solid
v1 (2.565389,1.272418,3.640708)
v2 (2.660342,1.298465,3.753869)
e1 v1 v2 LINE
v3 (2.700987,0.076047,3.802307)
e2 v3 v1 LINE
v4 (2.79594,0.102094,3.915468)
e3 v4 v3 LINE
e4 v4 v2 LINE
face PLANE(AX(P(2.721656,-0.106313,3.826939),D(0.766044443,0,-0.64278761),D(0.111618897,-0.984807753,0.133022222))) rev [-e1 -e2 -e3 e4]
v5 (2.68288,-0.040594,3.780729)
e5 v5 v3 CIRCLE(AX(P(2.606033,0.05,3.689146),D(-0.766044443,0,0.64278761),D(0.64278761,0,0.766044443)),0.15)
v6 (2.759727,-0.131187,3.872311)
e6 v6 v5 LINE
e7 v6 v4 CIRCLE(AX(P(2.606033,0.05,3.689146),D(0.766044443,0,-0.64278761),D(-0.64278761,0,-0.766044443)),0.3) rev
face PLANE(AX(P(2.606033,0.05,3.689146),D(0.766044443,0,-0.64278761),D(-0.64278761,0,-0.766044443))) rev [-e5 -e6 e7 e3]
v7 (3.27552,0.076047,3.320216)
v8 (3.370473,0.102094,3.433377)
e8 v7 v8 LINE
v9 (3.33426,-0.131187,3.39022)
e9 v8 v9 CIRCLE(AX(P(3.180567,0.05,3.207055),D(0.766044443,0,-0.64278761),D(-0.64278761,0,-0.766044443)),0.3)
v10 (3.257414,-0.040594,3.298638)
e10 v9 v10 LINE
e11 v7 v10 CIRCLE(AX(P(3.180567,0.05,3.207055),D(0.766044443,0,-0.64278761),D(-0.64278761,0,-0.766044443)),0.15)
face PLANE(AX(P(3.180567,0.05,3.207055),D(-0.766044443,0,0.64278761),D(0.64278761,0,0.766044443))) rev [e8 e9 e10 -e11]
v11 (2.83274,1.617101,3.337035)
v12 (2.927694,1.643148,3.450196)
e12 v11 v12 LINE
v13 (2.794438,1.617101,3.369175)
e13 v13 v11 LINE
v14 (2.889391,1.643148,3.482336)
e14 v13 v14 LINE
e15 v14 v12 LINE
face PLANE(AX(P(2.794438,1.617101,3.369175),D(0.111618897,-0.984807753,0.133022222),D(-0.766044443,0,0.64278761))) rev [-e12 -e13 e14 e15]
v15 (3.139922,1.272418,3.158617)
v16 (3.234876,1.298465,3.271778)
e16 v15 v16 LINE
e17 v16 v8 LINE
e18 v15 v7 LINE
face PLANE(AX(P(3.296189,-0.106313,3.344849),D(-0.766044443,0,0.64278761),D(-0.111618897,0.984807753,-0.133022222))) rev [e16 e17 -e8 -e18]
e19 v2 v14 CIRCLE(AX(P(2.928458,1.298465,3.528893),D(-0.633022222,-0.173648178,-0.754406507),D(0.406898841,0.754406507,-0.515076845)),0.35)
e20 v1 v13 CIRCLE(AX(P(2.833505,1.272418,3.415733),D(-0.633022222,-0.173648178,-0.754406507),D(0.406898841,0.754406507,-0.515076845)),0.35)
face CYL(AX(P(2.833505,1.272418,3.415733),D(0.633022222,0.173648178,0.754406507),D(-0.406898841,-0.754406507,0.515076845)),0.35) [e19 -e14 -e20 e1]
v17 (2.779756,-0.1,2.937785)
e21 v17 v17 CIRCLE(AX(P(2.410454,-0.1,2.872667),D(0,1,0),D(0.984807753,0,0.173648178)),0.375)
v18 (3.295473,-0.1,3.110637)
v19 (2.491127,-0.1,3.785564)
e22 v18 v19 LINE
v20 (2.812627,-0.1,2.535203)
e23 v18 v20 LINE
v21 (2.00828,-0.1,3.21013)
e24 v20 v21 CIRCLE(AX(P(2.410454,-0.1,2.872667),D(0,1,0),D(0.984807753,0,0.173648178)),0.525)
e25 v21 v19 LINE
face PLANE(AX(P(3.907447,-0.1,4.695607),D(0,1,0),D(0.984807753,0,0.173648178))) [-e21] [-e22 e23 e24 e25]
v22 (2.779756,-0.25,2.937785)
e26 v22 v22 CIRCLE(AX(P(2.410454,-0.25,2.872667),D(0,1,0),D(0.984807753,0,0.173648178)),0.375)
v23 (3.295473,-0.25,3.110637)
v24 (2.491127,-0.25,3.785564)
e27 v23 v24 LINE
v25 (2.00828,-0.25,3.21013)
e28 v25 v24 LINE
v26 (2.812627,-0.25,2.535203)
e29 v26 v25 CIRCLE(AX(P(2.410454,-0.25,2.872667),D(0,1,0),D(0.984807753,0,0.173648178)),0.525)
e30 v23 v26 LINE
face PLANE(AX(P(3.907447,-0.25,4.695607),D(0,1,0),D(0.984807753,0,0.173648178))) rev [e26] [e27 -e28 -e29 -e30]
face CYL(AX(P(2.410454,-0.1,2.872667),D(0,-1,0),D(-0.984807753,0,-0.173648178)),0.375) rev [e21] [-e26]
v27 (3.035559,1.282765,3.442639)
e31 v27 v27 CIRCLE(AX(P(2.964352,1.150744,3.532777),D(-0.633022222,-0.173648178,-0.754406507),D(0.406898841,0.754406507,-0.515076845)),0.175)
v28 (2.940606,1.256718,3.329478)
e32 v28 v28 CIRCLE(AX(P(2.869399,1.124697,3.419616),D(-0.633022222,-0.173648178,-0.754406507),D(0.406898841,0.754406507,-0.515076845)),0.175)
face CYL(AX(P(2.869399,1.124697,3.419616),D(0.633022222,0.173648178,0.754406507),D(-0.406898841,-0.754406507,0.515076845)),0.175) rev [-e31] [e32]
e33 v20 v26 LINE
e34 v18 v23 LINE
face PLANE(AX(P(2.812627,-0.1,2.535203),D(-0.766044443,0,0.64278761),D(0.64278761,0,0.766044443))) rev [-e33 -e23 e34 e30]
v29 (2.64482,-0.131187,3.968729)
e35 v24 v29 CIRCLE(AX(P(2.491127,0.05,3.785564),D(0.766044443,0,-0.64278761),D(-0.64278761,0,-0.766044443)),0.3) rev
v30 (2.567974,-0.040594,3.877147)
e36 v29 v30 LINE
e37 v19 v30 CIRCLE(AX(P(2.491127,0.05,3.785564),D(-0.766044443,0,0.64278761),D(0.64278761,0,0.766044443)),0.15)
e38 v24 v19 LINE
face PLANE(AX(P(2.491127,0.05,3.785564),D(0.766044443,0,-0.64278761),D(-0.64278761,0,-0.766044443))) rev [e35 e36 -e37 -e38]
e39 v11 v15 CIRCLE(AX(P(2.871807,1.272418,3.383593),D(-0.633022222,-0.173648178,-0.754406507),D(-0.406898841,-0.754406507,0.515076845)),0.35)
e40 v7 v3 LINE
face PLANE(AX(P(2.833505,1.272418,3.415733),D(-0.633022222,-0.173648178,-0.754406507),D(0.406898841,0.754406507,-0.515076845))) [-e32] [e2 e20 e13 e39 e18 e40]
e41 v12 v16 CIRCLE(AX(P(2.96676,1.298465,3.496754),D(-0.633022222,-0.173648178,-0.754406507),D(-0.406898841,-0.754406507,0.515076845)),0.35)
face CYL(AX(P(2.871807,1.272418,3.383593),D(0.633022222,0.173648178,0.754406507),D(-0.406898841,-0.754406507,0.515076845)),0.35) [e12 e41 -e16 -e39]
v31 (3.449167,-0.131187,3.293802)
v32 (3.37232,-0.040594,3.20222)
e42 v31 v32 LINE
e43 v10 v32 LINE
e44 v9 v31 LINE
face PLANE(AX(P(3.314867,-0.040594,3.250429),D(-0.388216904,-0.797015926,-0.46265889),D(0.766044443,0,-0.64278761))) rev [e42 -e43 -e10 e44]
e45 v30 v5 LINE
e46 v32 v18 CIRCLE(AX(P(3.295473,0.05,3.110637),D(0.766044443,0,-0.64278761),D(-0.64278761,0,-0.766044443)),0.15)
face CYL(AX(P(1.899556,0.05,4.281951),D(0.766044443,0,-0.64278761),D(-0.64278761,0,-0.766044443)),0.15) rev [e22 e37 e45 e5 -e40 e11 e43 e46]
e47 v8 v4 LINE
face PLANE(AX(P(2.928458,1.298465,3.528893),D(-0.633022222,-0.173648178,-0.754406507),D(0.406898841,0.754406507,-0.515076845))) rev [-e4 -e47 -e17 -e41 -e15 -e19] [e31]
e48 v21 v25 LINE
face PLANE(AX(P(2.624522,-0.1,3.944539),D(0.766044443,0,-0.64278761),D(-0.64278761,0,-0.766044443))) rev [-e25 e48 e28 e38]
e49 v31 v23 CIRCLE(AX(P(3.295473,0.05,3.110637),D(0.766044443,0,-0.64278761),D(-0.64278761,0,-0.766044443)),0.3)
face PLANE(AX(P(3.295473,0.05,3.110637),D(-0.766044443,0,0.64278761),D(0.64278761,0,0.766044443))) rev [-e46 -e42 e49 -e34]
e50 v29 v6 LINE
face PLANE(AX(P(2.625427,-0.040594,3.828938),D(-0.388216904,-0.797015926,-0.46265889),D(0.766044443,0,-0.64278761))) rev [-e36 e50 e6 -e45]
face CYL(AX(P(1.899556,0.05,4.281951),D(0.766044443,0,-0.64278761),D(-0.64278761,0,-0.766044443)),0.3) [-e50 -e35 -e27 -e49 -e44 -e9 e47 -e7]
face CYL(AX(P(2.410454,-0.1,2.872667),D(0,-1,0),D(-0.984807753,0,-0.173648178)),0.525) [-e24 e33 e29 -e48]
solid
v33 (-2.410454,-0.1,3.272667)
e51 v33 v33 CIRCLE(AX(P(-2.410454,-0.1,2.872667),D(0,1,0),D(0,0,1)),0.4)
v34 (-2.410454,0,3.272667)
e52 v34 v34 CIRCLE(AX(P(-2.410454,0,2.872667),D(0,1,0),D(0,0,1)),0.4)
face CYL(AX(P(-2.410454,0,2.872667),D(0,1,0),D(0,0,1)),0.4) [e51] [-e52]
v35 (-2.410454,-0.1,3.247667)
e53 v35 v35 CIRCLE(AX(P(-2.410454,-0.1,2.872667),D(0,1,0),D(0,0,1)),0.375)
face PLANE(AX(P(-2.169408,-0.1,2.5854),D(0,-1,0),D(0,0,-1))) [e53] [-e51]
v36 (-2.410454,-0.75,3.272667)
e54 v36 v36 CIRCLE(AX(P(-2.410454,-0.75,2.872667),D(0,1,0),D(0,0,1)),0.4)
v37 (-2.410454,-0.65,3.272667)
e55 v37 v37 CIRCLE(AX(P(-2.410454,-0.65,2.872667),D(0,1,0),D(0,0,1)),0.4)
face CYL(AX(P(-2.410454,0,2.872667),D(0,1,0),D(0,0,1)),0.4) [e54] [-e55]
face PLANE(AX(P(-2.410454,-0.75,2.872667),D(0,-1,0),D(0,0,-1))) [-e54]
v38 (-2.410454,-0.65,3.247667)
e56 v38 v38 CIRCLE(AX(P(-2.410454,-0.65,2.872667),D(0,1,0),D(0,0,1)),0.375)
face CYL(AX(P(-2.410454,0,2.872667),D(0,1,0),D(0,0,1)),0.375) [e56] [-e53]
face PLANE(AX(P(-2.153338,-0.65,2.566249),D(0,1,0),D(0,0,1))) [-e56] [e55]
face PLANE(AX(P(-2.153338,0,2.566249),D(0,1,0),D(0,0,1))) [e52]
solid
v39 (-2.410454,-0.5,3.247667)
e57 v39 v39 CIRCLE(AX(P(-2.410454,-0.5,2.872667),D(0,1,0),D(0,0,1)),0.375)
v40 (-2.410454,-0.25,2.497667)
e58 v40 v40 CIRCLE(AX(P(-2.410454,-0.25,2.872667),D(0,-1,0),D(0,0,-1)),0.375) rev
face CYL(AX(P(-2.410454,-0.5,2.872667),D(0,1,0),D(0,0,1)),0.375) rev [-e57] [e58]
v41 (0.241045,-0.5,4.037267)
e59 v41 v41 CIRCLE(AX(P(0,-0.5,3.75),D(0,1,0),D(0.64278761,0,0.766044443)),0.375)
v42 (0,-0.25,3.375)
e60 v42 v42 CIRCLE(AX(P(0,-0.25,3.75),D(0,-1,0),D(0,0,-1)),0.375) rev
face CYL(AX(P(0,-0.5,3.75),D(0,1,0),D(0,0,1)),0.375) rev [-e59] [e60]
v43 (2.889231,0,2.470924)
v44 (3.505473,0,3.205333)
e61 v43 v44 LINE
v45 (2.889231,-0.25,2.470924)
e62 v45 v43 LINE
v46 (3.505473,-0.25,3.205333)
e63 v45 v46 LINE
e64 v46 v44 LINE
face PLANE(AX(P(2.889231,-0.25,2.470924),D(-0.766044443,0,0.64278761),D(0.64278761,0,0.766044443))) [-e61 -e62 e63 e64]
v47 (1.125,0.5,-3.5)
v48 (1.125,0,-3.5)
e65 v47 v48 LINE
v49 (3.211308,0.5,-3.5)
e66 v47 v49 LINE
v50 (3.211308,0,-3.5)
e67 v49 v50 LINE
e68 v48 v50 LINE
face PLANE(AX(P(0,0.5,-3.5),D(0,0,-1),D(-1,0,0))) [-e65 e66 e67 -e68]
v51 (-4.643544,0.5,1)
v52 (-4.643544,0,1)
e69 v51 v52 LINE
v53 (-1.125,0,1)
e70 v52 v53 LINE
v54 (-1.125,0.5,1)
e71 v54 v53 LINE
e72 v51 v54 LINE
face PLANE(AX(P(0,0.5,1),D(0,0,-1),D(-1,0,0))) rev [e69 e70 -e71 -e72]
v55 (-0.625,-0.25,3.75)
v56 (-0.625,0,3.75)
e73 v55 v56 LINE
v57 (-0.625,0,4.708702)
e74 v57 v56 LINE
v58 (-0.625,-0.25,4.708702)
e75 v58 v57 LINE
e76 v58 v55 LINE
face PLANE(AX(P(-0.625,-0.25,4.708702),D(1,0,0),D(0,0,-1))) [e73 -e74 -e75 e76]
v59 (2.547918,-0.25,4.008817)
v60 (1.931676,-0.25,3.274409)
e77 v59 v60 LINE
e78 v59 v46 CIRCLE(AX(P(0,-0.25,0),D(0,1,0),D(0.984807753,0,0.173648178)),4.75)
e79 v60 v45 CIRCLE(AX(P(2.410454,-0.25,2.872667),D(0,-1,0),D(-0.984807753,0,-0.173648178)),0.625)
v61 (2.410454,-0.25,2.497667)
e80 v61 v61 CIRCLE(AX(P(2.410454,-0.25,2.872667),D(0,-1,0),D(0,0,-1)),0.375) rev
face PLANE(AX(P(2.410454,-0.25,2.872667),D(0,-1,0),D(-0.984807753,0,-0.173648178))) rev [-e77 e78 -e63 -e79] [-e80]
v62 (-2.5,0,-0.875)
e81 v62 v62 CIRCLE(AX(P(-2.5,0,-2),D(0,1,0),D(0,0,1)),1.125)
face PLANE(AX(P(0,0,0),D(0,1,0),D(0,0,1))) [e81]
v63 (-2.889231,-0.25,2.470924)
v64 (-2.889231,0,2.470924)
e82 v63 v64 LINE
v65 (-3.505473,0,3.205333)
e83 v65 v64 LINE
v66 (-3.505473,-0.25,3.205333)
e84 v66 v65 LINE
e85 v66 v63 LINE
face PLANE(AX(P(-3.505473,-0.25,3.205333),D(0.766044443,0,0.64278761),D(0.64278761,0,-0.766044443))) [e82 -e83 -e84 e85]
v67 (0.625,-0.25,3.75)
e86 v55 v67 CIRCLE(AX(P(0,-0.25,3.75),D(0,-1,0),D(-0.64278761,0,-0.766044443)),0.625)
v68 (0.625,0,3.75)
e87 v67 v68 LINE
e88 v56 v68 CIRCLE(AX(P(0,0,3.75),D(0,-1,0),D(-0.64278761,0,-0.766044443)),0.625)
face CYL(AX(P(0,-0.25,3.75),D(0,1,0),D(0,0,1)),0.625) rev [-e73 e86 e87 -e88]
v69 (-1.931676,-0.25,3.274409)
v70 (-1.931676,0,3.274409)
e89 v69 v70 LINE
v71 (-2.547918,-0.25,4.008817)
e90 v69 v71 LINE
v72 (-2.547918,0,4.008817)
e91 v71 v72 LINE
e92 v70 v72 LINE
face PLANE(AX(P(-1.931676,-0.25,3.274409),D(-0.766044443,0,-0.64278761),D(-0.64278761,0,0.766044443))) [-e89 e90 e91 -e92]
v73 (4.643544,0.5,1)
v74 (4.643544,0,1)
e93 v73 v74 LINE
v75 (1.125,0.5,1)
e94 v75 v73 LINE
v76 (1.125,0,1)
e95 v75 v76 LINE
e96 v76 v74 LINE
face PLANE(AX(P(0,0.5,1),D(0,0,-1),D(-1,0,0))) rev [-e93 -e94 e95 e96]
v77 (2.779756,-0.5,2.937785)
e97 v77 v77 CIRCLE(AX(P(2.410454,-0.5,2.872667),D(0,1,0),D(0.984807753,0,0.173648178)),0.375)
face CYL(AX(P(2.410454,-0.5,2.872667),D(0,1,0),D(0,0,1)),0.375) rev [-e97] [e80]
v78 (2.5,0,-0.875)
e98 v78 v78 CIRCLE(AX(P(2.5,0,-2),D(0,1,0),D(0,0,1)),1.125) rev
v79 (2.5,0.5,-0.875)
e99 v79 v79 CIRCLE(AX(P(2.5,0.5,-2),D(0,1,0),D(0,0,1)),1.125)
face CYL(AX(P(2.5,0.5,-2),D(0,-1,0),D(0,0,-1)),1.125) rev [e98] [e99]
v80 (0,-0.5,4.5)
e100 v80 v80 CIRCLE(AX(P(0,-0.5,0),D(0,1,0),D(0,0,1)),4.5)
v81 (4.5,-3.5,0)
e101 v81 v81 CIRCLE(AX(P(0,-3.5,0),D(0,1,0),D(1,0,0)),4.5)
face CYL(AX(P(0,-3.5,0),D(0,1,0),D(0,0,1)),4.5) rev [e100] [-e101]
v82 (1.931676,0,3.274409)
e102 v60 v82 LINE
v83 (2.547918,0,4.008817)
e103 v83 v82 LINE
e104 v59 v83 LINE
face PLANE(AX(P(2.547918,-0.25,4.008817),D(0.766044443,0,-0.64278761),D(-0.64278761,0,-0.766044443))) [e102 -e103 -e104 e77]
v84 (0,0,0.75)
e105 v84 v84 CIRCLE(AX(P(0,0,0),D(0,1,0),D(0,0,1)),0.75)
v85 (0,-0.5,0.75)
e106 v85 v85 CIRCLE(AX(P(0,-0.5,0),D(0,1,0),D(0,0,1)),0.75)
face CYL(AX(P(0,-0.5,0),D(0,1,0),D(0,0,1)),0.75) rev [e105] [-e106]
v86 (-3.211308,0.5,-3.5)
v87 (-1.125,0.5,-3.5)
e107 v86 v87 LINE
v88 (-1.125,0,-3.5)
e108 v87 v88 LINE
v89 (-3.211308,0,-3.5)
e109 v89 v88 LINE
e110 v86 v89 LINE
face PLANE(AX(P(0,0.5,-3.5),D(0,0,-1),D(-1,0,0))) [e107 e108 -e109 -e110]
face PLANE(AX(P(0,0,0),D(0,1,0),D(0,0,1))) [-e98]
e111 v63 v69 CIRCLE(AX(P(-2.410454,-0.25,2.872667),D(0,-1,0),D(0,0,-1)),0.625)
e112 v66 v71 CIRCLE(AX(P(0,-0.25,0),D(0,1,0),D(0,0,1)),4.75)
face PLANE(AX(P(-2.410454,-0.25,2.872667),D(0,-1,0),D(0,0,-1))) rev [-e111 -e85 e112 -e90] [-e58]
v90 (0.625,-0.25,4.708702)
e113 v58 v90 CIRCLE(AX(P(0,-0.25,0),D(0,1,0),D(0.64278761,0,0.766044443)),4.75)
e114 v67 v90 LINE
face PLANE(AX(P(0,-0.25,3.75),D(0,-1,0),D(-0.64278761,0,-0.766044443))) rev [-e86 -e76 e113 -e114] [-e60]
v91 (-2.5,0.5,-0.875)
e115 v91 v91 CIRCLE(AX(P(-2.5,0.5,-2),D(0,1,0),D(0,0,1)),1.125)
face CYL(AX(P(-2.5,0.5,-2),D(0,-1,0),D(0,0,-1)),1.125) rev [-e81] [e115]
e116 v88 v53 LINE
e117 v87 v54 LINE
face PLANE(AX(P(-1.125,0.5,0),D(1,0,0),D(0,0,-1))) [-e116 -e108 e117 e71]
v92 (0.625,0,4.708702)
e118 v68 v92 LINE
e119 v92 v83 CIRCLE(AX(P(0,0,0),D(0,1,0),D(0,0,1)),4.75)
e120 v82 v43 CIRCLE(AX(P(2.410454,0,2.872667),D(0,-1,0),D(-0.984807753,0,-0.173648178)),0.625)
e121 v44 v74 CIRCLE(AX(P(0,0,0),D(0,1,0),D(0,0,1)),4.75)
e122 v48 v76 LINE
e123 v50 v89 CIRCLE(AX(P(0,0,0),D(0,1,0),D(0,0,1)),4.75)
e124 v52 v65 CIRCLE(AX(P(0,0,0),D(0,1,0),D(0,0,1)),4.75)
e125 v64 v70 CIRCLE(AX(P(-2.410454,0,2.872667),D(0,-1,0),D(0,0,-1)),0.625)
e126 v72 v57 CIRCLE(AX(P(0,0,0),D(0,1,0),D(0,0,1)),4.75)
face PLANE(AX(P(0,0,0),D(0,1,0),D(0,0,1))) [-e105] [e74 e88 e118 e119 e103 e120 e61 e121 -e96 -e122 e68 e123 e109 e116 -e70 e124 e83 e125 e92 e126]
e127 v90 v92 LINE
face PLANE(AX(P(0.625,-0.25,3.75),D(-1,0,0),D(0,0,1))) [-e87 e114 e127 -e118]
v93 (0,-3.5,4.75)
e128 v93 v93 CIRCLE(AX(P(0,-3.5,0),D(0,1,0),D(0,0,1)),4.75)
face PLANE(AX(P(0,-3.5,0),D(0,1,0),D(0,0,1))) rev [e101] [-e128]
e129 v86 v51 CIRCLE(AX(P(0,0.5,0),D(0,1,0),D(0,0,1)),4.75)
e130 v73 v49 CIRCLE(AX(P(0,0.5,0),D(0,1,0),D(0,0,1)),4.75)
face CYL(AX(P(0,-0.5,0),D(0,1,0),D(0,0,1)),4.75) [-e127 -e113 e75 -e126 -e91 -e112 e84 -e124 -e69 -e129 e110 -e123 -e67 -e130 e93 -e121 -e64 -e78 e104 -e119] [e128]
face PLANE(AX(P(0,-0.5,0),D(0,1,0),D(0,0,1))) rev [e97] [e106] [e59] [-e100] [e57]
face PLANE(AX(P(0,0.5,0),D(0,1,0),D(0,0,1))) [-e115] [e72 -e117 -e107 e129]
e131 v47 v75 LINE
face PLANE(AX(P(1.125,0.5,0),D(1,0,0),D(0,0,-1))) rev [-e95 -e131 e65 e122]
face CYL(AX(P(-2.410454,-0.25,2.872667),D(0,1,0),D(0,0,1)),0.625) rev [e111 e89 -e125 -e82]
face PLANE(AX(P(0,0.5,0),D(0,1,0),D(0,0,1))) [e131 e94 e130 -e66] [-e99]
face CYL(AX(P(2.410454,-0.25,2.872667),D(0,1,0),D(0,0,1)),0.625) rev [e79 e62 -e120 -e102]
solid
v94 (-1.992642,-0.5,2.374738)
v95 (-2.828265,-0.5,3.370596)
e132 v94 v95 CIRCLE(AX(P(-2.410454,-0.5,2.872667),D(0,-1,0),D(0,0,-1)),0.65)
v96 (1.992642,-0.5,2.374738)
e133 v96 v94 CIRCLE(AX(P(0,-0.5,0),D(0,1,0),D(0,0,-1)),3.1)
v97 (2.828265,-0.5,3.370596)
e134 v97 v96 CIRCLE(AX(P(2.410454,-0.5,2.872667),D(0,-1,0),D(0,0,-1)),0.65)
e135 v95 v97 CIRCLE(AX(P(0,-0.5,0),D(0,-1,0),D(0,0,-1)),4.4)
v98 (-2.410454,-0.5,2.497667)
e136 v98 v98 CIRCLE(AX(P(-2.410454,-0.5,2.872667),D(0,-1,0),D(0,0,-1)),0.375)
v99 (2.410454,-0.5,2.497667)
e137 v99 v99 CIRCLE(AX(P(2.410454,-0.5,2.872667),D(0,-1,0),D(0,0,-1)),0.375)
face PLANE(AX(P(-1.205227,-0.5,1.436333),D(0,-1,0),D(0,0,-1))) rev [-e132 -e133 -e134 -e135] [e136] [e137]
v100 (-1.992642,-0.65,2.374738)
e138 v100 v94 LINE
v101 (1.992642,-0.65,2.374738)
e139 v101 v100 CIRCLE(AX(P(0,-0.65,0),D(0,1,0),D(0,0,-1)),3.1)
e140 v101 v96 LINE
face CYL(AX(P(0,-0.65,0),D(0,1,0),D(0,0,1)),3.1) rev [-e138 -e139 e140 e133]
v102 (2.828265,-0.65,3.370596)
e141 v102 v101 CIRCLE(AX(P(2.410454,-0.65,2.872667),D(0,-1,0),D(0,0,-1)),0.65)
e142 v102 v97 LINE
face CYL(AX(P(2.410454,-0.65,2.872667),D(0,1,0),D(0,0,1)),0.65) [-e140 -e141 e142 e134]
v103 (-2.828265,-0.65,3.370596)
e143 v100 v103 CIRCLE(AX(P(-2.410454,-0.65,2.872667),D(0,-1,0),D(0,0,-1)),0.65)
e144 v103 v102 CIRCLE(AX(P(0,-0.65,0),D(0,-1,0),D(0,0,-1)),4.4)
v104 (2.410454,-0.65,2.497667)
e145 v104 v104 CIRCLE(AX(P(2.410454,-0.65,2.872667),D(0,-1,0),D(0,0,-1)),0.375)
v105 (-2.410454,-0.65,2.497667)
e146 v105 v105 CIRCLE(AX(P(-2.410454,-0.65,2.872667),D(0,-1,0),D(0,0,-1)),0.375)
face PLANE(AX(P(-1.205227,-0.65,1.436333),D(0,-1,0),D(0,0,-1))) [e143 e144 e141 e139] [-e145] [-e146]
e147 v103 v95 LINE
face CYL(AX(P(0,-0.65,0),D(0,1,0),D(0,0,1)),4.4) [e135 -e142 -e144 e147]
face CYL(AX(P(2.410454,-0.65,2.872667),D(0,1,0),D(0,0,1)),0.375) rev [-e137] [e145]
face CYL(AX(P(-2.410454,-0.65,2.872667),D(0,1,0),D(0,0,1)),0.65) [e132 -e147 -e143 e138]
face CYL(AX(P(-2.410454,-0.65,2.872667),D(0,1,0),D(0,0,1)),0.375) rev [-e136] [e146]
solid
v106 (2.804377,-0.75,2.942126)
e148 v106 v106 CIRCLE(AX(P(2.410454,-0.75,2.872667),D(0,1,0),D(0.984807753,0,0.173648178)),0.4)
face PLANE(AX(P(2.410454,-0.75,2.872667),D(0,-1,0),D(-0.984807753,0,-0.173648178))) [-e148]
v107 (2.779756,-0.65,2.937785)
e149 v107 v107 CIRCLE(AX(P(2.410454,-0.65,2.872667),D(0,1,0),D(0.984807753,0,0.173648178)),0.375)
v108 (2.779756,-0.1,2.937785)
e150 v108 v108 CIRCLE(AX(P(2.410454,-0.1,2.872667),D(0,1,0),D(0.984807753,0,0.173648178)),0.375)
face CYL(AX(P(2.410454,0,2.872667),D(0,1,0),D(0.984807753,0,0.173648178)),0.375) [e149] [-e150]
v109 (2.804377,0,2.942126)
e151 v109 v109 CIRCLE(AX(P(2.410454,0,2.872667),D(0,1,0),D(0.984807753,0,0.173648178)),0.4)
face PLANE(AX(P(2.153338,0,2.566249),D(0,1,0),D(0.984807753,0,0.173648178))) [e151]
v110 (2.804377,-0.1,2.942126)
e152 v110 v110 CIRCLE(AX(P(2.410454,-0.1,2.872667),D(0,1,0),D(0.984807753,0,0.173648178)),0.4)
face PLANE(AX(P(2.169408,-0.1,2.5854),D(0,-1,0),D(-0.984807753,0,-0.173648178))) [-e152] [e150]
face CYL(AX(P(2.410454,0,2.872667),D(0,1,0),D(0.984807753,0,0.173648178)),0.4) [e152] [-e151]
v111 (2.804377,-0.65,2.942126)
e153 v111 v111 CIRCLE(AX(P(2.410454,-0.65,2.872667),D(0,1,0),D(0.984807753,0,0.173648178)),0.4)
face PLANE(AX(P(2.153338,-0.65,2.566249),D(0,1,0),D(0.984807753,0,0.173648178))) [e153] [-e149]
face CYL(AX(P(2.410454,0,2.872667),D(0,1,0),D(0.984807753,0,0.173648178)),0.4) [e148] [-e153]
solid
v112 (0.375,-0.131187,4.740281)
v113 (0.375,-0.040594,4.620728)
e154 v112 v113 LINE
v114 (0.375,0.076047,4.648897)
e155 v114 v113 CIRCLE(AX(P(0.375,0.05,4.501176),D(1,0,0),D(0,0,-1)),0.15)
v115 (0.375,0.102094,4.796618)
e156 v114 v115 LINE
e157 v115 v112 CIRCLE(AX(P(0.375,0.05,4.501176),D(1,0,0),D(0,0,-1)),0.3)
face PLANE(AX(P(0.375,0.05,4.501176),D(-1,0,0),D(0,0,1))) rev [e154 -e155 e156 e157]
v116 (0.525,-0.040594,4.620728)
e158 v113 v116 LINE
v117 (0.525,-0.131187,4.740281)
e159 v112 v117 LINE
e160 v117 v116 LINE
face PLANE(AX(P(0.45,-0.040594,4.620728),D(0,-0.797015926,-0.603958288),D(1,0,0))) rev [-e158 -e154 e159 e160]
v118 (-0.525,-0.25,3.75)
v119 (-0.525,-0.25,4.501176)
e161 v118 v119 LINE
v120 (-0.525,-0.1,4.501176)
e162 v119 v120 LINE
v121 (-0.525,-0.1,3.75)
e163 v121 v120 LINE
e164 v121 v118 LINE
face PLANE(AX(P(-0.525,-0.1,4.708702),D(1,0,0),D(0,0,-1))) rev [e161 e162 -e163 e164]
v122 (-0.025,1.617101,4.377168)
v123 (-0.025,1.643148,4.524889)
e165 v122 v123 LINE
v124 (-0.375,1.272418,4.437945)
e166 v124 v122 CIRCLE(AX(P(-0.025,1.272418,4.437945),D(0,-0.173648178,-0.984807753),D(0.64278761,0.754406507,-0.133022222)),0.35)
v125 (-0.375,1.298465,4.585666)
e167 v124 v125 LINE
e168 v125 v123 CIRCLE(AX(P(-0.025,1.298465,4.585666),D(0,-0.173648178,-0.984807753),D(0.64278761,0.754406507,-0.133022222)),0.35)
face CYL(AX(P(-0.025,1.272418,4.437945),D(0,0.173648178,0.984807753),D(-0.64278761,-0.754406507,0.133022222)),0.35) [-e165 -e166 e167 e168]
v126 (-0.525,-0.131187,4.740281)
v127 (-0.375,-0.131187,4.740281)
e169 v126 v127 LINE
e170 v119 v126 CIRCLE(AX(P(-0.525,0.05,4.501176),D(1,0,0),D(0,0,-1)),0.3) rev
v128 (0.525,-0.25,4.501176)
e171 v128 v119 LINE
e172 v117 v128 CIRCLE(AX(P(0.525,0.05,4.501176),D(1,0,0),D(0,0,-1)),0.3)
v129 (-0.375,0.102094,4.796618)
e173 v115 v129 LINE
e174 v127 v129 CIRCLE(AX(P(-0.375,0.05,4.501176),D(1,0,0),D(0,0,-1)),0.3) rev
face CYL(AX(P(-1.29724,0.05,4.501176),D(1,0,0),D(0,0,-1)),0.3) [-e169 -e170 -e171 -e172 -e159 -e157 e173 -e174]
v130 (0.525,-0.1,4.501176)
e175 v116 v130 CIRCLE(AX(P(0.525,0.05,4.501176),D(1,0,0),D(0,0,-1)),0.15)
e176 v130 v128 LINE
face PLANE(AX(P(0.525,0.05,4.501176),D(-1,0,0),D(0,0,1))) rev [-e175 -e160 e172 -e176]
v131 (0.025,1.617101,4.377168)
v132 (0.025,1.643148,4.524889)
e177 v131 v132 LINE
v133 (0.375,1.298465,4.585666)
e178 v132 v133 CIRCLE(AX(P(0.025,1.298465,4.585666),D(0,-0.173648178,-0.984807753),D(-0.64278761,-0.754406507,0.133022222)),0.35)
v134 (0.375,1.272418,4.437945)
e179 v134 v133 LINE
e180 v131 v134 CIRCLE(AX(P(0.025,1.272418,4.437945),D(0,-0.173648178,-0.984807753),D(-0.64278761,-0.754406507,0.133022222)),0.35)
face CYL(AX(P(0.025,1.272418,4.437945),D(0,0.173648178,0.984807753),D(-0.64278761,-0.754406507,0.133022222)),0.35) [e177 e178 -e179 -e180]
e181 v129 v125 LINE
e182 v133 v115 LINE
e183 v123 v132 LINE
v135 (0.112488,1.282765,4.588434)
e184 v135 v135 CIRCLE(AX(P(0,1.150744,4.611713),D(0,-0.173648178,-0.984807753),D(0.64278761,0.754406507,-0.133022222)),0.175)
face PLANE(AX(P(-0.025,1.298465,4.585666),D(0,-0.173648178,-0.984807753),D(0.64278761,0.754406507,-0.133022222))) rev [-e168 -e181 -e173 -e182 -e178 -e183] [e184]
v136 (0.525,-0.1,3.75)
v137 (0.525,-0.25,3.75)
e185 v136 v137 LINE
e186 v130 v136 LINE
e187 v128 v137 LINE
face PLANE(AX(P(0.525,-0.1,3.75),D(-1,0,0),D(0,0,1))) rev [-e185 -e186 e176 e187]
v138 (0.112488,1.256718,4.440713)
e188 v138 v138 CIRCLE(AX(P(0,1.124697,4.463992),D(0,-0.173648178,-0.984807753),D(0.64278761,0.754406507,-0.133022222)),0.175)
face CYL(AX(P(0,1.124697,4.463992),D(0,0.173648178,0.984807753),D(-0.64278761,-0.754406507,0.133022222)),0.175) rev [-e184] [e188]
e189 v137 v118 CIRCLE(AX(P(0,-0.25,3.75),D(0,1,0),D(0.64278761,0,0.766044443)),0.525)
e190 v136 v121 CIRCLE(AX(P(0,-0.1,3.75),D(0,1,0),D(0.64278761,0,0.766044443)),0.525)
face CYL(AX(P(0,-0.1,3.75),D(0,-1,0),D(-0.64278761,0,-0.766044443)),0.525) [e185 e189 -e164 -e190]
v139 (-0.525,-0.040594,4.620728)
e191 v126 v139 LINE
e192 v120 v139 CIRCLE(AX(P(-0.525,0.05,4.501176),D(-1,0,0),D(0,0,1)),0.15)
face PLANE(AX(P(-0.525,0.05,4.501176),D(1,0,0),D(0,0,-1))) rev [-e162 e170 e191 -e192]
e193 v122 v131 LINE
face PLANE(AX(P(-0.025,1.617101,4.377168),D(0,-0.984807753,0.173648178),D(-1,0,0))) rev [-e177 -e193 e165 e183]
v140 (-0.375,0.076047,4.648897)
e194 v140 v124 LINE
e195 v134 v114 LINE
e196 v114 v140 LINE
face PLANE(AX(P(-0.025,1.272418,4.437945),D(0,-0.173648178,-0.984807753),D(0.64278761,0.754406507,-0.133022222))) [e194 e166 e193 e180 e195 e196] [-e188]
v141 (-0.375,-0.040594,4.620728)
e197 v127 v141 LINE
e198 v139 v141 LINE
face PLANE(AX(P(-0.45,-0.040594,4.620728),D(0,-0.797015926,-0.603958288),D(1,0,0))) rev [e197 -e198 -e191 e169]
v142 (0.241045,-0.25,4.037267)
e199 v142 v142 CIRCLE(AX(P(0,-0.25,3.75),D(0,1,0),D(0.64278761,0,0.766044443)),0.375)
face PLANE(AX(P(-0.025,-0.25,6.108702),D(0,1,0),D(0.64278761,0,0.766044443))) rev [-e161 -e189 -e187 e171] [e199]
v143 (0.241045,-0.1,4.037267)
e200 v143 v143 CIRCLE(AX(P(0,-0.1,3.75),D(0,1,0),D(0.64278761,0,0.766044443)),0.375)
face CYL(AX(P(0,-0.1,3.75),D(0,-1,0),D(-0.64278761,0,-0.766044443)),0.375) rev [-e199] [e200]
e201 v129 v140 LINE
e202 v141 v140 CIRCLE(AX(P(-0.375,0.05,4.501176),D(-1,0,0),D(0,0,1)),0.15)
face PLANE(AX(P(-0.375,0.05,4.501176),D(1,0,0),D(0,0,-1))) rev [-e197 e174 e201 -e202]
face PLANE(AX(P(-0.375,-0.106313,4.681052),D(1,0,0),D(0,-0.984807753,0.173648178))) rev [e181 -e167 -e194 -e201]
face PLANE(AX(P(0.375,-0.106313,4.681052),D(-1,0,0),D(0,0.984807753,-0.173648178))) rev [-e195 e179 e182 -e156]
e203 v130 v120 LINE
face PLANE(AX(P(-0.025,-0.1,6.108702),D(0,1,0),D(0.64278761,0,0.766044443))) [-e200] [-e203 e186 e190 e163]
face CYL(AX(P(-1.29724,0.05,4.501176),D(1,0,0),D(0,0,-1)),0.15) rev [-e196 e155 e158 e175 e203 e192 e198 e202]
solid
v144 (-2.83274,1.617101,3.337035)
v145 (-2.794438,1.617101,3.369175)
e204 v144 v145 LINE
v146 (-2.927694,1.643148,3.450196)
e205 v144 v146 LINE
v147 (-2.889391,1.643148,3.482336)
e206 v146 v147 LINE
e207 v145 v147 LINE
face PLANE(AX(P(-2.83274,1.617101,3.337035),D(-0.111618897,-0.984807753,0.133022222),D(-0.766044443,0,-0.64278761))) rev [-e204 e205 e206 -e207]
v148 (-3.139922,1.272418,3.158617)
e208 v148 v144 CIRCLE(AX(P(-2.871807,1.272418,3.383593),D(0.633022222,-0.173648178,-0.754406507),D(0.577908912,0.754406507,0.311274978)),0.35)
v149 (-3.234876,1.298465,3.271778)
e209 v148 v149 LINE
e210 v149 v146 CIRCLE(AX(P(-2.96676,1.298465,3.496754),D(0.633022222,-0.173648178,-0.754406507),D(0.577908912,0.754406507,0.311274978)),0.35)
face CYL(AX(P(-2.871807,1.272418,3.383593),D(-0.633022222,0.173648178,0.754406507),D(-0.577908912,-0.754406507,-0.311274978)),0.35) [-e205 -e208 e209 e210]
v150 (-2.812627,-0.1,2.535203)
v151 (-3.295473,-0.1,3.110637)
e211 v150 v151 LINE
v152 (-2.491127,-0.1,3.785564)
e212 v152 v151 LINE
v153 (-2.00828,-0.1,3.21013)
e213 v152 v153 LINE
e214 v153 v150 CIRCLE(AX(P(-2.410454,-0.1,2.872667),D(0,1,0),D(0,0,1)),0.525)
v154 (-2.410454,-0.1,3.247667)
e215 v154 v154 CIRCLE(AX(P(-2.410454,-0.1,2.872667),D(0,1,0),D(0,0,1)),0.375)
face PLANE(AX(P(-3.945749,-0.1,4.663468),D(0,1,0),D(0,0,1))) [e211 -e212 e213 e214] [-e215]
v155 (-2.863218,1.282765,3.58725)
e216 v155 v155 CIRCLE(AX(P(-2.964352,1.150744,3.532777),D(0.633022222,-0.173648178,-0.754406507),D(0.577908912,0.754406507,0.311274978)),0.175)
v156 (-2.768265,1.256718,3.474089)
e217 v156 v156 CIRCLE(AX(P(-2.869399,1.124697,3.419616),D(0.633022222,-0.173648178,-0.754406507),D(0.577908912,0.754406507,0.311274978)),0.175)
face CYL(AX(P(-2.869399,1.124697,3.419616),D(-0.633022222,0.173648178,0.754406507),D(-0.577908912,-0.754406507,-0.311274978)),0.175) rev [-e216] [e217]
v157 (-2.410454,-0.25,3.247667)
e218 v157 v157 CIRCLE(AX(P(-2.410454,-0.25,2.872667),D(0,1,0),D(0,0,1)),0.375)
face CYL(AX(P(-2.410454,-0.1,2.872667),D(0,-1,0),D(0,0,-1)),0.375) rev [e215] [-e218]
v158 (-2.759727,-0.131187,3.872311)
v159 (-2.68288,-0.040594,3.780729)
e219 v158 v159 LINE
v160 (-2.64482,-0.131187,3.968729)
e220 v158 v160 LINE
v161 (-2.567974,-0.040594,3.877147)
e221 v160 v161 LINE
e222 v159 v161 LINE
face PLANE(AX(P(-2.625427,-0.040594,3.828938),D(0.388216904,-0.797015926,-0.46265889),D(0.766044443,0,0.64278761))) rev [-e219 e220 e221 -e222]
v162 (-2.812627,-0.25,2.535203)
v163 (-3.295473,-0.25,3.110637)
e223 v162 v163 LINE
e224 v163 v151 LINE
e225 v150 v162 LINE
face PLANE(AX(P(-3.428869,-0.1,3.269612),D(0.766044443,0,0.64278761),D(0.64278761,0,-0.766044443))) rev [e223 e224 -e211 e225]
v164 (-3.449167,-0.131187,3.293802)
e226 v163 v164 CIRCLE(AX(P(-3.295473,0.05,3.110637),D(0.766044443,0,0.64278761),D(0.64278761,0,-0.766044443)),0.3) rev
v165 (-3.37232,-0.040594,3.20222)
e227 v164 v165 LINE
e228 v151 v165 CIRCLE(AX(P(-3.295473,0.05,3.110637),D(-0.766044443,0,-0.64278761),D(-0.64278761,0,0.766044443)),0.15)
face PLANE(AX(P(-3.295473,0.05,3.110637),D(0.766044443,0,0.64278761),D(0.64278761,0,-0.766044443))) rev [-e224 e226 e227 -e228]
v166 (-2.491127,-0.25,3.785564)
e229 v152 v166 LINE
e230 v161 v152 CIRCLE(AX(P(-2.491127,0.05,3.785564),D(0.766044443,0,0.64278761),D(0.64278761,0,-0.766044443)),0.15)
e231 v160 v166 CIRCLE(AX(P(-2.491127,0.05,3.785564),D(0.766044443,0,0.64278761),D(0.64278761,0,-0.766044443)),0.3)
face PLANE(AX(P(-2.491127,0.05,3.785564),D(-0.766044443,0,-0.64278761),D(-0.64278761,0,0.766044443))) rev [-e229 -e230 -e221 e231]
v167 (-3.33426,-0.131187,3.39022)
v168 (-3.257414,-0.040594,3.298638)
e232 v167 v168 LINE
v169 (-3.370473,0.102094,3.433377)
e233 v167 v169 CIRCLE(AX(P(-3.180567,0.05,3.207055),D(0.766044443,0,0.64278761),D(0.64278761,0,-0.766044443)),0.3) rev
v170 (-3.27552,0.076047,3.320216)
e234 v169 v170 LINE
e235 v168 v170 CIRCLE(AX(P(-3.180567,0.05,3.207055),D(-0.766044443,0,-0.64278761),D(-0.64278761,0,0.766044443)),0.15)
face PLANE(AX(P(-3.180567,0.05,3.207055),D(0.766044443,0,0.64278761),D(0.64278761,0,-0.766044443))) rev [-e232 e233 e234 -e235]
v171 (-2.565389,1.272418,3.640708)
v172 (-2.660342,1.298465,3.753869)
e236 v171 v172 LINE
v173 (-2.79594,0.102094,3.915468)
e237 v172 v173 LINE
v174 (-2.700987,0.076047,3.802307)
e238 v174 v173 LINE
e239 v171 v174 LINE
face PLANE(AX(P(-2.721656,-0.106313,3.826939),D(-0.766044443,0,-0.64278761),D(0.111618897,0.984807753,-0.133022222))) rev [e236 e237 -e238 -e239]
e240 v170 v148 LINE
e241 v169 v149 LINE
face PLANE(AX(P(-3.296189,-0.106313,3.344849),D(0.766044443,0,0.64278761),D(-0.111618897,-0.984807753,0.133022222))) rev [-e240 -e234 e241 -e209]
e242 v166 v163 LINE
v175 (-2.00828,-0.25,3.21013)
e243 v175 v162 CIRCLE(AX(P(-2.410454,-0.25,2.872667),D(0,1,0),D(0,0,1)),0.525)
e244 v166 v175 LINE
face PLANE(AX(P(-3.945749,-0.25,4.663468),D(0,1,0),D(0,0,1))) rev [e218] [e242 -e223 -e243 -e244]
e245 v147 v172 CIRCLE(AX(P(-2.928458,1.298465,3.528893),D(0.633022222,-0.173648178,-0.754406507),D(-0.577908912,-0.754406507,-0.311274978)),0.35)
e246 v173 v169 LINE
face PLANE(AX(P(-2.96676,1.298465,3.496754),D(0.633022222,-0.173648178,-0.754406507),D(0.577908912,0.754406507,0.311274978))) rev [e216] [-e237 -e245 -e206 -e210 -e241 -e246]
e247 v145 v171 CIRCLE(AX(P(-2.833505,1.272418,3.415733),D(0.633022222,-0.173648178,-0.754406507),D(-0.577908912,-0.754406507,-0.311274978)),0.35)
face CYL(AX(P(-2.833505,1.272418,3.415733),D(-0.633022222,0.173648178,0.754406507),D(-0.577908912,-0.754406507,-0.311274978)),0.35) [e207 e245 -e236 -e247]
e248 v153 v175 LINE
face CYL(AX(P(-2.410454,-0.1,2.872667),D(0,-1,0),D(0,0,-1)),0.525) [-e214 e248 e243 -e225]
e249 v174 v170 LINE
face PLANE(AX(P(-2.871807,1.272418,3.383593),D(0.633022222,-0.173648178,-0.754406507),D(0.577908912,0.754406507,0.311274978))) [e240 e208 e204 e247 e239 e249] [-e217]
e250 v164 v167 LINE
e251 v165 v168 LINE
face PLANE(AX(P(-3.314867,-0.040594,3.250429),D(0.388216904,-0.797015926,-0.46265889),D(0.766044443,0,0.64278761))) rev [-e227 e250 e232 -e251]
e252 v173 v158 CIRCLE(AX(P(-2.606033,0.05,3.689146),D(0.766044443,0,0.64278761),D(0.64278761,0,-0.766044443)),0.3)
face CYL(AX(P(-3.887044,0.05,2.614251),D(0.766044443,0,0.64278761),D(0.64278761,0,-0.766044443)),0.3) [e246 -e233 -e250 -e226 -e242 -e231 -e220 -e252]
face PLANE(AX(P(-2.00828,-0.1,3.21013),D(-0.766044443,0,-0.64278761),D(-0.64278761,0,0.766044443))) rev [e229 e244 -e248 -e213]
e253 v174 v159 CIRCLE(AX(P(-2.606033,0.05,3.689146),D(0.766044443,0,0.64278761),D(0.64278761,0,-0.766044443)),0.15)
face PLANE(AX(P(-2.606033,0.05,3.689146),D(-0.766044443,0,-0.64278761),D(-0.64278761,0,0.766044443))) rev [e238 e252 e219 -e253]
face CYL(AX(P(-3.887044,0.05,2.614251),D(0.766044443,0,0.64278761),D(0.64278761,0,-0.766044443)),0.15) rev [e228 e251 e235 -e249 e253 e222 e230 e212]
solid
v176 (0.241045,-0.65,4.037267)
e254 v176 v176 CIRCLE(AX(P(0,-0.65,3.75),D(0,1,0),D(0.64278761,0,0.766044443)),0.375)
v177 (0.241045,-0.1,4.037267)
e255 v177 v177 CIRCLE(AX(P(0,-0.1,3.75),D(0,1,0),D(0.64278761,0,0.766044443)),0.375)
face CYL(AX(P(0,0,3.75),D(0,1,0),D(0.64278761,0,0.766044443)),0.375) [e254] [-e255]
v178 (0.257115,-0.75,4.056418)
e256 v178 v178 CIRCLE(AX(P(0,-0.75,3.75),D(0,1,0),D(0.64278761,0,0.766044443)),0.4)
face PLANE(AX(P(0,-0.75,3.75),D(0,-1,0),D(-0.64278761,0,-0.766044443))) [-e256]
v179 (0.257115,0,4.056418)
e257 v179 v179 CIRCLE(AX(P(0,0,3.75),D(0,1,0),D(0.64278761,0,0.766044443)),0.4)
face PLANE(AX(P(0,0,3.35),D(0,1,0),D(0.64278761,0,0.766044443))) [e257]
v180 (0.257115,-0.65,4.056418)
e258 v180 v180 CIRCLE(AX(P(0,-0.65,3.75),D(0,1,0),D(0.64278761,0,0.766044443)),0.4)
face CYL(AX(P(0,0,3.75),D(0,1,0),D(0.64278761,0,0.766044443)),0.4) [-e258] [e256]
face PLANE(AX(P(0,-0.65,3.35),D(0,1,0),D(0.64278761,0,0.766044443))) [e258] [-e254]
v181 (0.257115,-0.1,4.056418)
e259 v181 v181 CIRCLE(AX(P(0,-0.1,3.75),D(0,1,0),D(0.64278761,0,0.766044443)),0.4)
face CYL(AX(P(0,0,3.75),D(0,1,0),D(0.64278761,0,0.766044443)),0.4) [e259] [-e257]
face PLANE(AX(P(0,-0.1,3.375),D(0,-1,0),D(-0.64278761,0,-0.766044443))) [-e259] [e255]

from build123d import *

# Parameters (mm, degrees)
SKETCH1_R                  = 4.75
SKETCH1_R_2                = 0.75
BOSS_EXTRUDE1_DEPTH        = 0.5
BOSS_EXTRUDE2_START        = 0.5
SKETCH1_3_R                = 1.125
BOSS_EXTRUDE2_DEPTH        = 0.5
SKETCH2_R                  = 0.375
CUT_EXTRUDE1_DEPTH         = 7.736096793
CUT_EXTRUDE2_DEPTH         = 0.25
CIRPATTERN2_COUNT          = 3
CIRPATTERN2_ANGLE          = 80
EXTRUDE_THIN2_START        = -0.5
SKETCH1_5_R                = 4.75
SKETCH1_5_R_2              = 4.5
EXTRUDE_THIN2_DEPTH        = 3
BASE_FLANGE2_START         = 0.15
SKETCH6_R                  = 0.175
SKETCH6_R_2                = 0.375
BASE_FLANGE2_DEPTH         = 0.15
SKETCHED_START             = -0.525
SKETCHED_BEND1_DEPTH       = 1.05
SKETCHED_BEND1_2_DEPTH     = 0.15
SKETCHED_START_2           = 0.375
SKETCHED_BEND1_3_DEPTH     = 0.15
SKETCHED_BEND1_4_DEPTH     = 1.05
SKETCHED_START_3           = -0.375
SKETCHED_BEND1_5_DEPTH     = 0.75
SKETCHED_START_4           = -4.741475404
SKETCHED_BEND1_6_OUTLINE_R = 0.175
SKETCHED_BEND1_6_DEPTH     = 0.149999999
SKETCH16_R                 = 0.375
BASE_FLANGE3_DEPTH         = 0.15
CIRPATTERN3_COUNT          = 3
CIRPATTERN3_ANGLE          = 80


with BuildPart() as part:
    # Sketch1 → Boss-Extrude1 (new body)
    with BuildSketch(Plane(origin=(0, 0, 0), x_dir=(1, 0, 0), z_dir=(0, 1, 0))):
        with Locations(Location((0, 0, 0), (0, 0, 270))):
            Circle(SKETCH1_R)
        with Locations(Location((0, 0, 0), (0, 0, 270))):
            Circle(SKETCH1_R_2, mode=Mode.SUBTRACT)
    extrude(amount=-BOSS_EXTRUDE1_DEPTH)

    # Sketch1<3> → Boss-Extrude2 (add)
    # profile 1 of 2: a face of its own
    with BuildSketch(Plane(origin=(0, 0, 0), x_dir=(1, 0, 0), z_dir=(0, 1, 0)).offset(BOSS_EXTRUDE2_START)):
        with BuildLine():
            ThreePointArc((-3.211308145, 3.5), (-4.526276083, 1.440598771), (-4.643543905, -1))
            Line((-4.643543905, -1), (-1.125, -1))
            Line((-1.125, -1), (-1.125, 3.5))
            Line((-1.125, 3.5), (-3.211308145, 3.5))
        make_face()
        with Locations(Location((-2.5, 2, 0), (0, 0, 270))):
            Circle(SKETCH1_3_R, mode=Mode.SUBTRACT)
    # profile 2 of 2: a face of its own
    with BuildSketch(Plane(origin=(0, 0, 0), x_dir=(1, 0, 0), z_dir=(0, 1, 0)).offset(BOSS_EXTRUDE2_START)):
        with BuildLine():
            Line((1.125, -1), (4.643543905, -1))
            ThreePointArc((4.643543905, -1), (4.723310997, -0.502825243), (4.75, 0))
            ThreePointArc((4.75, 0), (4.348345299, 1.911646713), (3.211308145, 3.5))
            Line((3.211308145, 3.5), (1.125, 3.5))
            Line((1.125, 3.5), (1.125, -1))
        make_face()
        with Locations(Location((2.5, 2, 0), (0, 0, 270))):
            Circle(SKETCH1_3_R, mode=Mode.SUBTRACT)
    extrude(amount=-BOSS_EXTRUDE2_DEPTH)

    # Sketch2 → Cut-Extrude1 (cut, through all)
    with BuildSketch(Plane(origin=(0, 0, 0), x_dir=(1, 0, 0), z_dir=(0, 1, 0))):
        with Locations(Location((-2.410453536, -2.872666662, 0), (0, 0, 270))):
            Circle(SKETCH2_R)
    cut_extrude1 = extrude(amount=-CUT_EXTRUDE1_DEPTH, mode=Mode.SUBTRACT)

    # Sketch2<3> → Cut-Extrude2 (cut)
    with BuildSketch(Plane(origin=(0, 0, 0), x_dir=(1, 0, 0), z_dir=(0, 1, 0))):
        with BuildLine():
            Line((-3.505473113, -3.205332784), (-2.889231313, -2.470924406))
            ThreePointArc((-2.889231313, -2.470924406), (-2.00871128, -2.393888885), (-1.931675759, -3.274408918))
            Line((-1.931675759, -3.274408918), (-2.547917559, -4.008817296))
            ThreePointArc((-2.547917559, -4.008817296), (-3.053241146, -3.638711105), (-3.505473113, -3.205332784))
        make_face()
    cut_extrude2 = extrude(amount=-CUT_EXTRUDE2_DEPTH, mode=Mode.SUBTRACT)

    # CirPattern2: Cut-Extrude1, Cut-Extrude2 ×3 about axis
    cirpattern2_axis = Axis((0, 0, 0), (0, 1, 0))
    add([cut_extrude1.rotate(cirpattern2_axis, i * CIRPATTERN2_ANGLE / (CIRPATTERN2_COUNT - 1)) for i in range(1, CIRPATTERN2_COUNT)], mode=Mode.SUBTRACT)
    add([cut_extrude2.rotate(cirpattern2_axis, i * CIRPATTERN2_ANGLE / (CIRPATTERN2_COUNT - 1)) for i in range(1, CIRPATTERN2_COUNT)], mode=Mode.SUBTRACT)

    # Sketch1<5> → Extrude-Thin2 (add)
    with BuildSketch(Plane(origin=(0, 0, 0), x_dir=(1, 0, 0), z_dir=(0, 1, 0)).offset(EXTRUDE_THIN2_START)):
        Circle(SKETCH1_5_R)
        Circle(SKETCH1_5_R_2, mode=Mode.SUBTRACT)
    extrude(amount=-EXTRUDE_THIN2_DEPTH)


with BuildPart() as body_2:
    # Base-Flange2: sheet metal written as solids
    # Sketch6 → Base-Flange2 (new body)
    with BuildSketch(Plane(origin=(0, -0.25, 0), x_dir=(1, 0, 0), z_dir=(0, 1, 0)).offset(BASE_FLANGE2_START)):
        with BuildLine():
            Line((-3.428868668, -3.269611545), (-2.812626869, -2.535203167))
            ThreePointArc((-2.812626869, -2.535203167), (-2.072990041, -2.470493329), (-2.008280204, -3.210130157))
            Line((-2.008280204, -3.210130157), (-2.624522003, -3.944538535))
            Line((-2.624522003, -3.944538535), (-2.73942867, -3.848120394))
            Line((-2.73942867, -3.848120394), (-3.639331323, -4.920582614))
            ThreePointArc((-3.639331323, -4.920582614), (-3.876942368, -5.044275095), (-4.132422542, -4.963722506))
            Line((-4.132422542, -4.963722506), (-4.170724764, -4.931583125))
            ThreePointArc((-4.170724764, -4.931583125), (-4.294417245, -4.69397208), (-4.213864655, -4.438491907))
            Line((-4.213864655, -4.438491907), (-3.313962002, -3.366029686))
            Line((-3.313962002, -3.366029686), (-3.428868668, -3.269611545))
        make_face()
        with Locations(Location((-3.830179848, -4.564630594, 0), (0, 0, 270))):
            Circle(SKETCH6_R, mode=Mode.SUBTRACT)
        with Locations(Location((-2.410453536, -2.872666662, 0), (0, 0, 270))):
            Circle(SKETCH6_R_2, mode=Mode.SUBTRACT)
    extrude(amount=-BASE_FLANGE2_DEPTH)

    # Sketched Bend1: read off the stored shape, not the designer's step
    # Sketched Bend1 outline → Sketched Bend1 (cut)
    with BuildSketch(Plane(origin=(0, 0, 0), x_dir=(0.642787609686532, 0, -0.7660444431189841), z_dir=(0.7660444431189841, 0, 0.6427876096865321)).offset(SKETCHED_START)):
        with BuildLine():
            Line((-4.760983594, -0.1), (-6.45870205, -0.1))
            Line((-6.45870205, -0.1), (-6.45870205, -0.25))
            Line((-6.45870205, -0.25), (-4.501175973, -0.25))
            ThreePointArc((-4.501175973, -0.25), (-4.651175973, -0.209807621), (-4.760983594, -0.1))
        make_face()
    extrude(amount=SKETCHED_BEND1_DEPTH, mode=Mode.SUBTRACT)

    # Sketched Bend1 2 outline → Sketched Bend1 2 (cut)
    with BuildSketch(Plane(origin=(0, 0, 0), x_dir=(0.642787609686532, 0, -0.7660444431189841), z_dir=(0.7660444431189841, 0, 0.6427876096865321)).offset(SKETCHED_START)):
        Polygon((-4.70870205, -0.107257954), (-4.699124063, -0.1), (-4.70870205, -0.1), align=None)
    extrude(amount=SKETCHED_BEND1_2_DEPTH, mode=Mode.SUBTRACT)

    # Sketched Bend1 3 outline → Sketched Bend1 3 (cut)
    with BuildSketch(Plane(origin=(0, 0, 0), x_dir=(0.642787609686532, 0, -0.7660444431189841), z_dir=(0.7660444431189841, 0, 0.6427876096865321)).offset(SKETCHED_START_2)):
        Polygon((-4.70870205, -0.107257954), (-4.699124063, -0.1), (-4.70870205, -0.1), align=None)
    extrude(amount=SKETCHED_BEND1_3_DEPTH, mode=Mode.SUBTRACT)

    # Sketched Bend1 4 outline → Sketched Bend1 4 (add)
    with BuildSketch(Plane(origin=(0, 0, 0), x_dir=(0.642787609686532, 0, -0.7660444431189841), z_dir=(0.7660444431189841, 0, 0.6427876096865321)).offset(SKETCHED_START)):
        with BuildLine():
            ThreePointArc((-4.501175973, -0.1), (-4.567925274, -0.084329932), (-4.620728362, -0.040593743))
            Line((-4.620728362, -0.040593743), (-4.699124063, -0.1))
            Line((-4.699124063, -0.1), (-4.501175973, -0.1))
        make_face()
        with BuildLine():
            Line((-4.70870205, -0.166640087), (-4.70870205, -0.107257954))
            Line((-4.70870205, -0.107257954), (-4.740280751, -0.131187486))
            ThreePointArc((-4.740280751, -0.131187486), (-4.725193834, -0.149539465), (-4.70870205, -0.166640087))
        make_face()
    extrude(amount=SKETCHED_BEND1_4_DEPTH)

    # Sketched Bend1 5 outline → Sketched Bend1 5 (add)
    with BuildSketch(Plane(origin=(0, 0, 0), x_dir=(0.642787609686532, 0, -0.7660444431189841), z_dir=(0.7660444431189841, 0, 0.6427876096865321)).offset(SKETCHED_START_3)):
        with BuildLine():
            ThreePointArc((-4.620728362, -0.040593743), (-4.646984295, 0.014787316), (-4.648897136, 0.076047227))
            Line((-4.648897136, 0.076047227), (-4.377167779, 1.617100985))
            Line((-4.377167779, 1.617100985), (-4.524888942, 1.643148211))
            Line((-4.524888942, 1.643148211), (-4.796618299, 0.102094453))
            ThreePointArc((-4.796618299, 0.102094453), (-4.796618299, -0.002094454), (-4.760983594, -0.1))
            Line((-4.760983594, -0.1), (-4.699124063, -0.1))
            Line((-4.699124063, -0.1), (-4.620728362, -0.040593743))
        make_face()
    extrude(amount=SKETCHED_BEND1_5_DEPTH)

    # Sketched Bend1 6 outline → Sketched Bend1 6 (cut)
    with BuildSketch(Plane(origin=(0, 0, 0), x_dir=(0.7741336234862156, 0.1419950663058049, 0.6168910228986253), z_dir=(0.6330222215594821, -0.17364817766693402, -0.7544065067354941)).offset(SKETCHED_START_4)):
        with BuildLine():
            Line((-0.251054745, -0.877817458), (0.095287988, -0.827352508))
            ThreePointArc((0.095287988, -0.827352508), (-0.164394149, -0.761595178), (-0.301519694, -0.531474724))
            Line((-0.301519694, -0.531474724), (-0.251054745, -0.877817458))
        make_face()
        with BuildLine():
            ThreePointArc((0.440643306, -0.423335547), (0.374885975, -0.683017684), (0.144765522, -0.82014323))
            Line((0.144765522, -0.82014323), (0.491108255, -0.769678281))
            Line((0.491108255, -0.769678281), (0.440643306, -0.423335547))
        make_face()
        with Locations((0.04793397, -0.328972536)):
            Circle(SKETCHED_BEND1_6_OUTLINE_R)
    extrude(amount=SKETCHED_BEND1_6_DEPTH, mode=Mode.SUBTRACT)


with BuildPart() as body_3:
    # Base-Flange3: sheet metal written as solids
    # Sketch16 → Base-Flange3 (new body)
    with BuildSketch(Plane.XZ.offset(0.5)):
        with BuildLine():
            ThreePointArc((-2.828265483, 3.37059555), (0, -4.4), (2.828265483, 3.37059555))
            ThreePointArc((2.828265483, 3.37059555), (1.912524648, 3.290478608), (1.99264159, 2.374737774))
            ThreePointArc((1.99264159, 2.374737774), (0, -3.1), (-1.99264159, 2.374737774))
            ThreePointArc((-1.99264159, 2.374737774), (-1.912524648, 3.290478608), (-2.828265483, 3.37059555))
        make_face()
        with Locations(Location((2.410453536, 2.872666662, 0), (0, 0, 270))):
            Circle(SKETCH16_R, mode=Mode.SUBTRACT)
        with Locations(Location((-2.410453536, 2.872666662, 0), (0, 0, 270))):
            Circle(SKETCH16_R, mode=Mode.SUBTRACT)
    extrude(amount=BASE_FLANGE3_DEPTH)


with BuildPart() as body_4:
    # Sketch19 → Revolve1 (revolve)
    with BuildSketch(Plane(origin=(0, 0, 0), x_dir=(-0.6427876096865404, 0, 0.7660444431189771), z_dir=(-0.7660444431189771, 0, -0.6427876096865404)), mode=Mode.PRIVATE) as revolve1_sk:
        Polygon((3.375, -0.1), (3.35, -0.1), (3.35, 0), (3.75, 0), (3.75, -0.75), (3.35, -0.75), (3.35, -0.65), (3.375, -0.65), align=None)
    revolve(revolve1_sk.sketch.rotate(Axis((-2.410453536, 0, 2.872666662), (0, -1, 0)), 140), axis=Axis((-2.410453536, 0, 2.872666662), (0, -1, 0)))


with BuildPart() as cirpattern3_1:
    # CirPattern3: pattern copy
    add(body_4.part.rotate(Axis((0, 0, 0), (0, 1, 0)), 1 * CIRPATTERN3_ANGLE / (CIRPATTERN3_COUNT - 1)))


with BuildPart() as cirpattern3_2:
    # CirPattern3: pattern copy
    add(body_4.part.rotate(Axis((0, 0, 0), (0, 1, 0)), 2 * CIRPATTERN3_ANGLE / (CIRPATTERN3_COUNT - 1)))


with BuildPart() as cirpattern3_3:
    # CirPattern3: pattern copy
    add(body_2.part.rotate(Axis((0, 0, 0), (0, 1, 0)), 1 * CIRPATTERN3_ANGLE / (CIRPATTERN3_COUNT - 1)))


with BuildPart() as cirpattern3_4:
    # CirPattern3: pattern copy
    add(body_2.part.rotate(Axis((0, 0, 0), (0, 1, 0)), 2 * CIRPATTERN3_ANGLE / (CIRPATTERN3_COUNT - 1)))


solid = Compound([part.part, body_2.part, body_3.part, body_4.part, cirpattern3_1.part, cirpattern3_2.part, cirpattern3_3.part, cirpattern3_4.part])
